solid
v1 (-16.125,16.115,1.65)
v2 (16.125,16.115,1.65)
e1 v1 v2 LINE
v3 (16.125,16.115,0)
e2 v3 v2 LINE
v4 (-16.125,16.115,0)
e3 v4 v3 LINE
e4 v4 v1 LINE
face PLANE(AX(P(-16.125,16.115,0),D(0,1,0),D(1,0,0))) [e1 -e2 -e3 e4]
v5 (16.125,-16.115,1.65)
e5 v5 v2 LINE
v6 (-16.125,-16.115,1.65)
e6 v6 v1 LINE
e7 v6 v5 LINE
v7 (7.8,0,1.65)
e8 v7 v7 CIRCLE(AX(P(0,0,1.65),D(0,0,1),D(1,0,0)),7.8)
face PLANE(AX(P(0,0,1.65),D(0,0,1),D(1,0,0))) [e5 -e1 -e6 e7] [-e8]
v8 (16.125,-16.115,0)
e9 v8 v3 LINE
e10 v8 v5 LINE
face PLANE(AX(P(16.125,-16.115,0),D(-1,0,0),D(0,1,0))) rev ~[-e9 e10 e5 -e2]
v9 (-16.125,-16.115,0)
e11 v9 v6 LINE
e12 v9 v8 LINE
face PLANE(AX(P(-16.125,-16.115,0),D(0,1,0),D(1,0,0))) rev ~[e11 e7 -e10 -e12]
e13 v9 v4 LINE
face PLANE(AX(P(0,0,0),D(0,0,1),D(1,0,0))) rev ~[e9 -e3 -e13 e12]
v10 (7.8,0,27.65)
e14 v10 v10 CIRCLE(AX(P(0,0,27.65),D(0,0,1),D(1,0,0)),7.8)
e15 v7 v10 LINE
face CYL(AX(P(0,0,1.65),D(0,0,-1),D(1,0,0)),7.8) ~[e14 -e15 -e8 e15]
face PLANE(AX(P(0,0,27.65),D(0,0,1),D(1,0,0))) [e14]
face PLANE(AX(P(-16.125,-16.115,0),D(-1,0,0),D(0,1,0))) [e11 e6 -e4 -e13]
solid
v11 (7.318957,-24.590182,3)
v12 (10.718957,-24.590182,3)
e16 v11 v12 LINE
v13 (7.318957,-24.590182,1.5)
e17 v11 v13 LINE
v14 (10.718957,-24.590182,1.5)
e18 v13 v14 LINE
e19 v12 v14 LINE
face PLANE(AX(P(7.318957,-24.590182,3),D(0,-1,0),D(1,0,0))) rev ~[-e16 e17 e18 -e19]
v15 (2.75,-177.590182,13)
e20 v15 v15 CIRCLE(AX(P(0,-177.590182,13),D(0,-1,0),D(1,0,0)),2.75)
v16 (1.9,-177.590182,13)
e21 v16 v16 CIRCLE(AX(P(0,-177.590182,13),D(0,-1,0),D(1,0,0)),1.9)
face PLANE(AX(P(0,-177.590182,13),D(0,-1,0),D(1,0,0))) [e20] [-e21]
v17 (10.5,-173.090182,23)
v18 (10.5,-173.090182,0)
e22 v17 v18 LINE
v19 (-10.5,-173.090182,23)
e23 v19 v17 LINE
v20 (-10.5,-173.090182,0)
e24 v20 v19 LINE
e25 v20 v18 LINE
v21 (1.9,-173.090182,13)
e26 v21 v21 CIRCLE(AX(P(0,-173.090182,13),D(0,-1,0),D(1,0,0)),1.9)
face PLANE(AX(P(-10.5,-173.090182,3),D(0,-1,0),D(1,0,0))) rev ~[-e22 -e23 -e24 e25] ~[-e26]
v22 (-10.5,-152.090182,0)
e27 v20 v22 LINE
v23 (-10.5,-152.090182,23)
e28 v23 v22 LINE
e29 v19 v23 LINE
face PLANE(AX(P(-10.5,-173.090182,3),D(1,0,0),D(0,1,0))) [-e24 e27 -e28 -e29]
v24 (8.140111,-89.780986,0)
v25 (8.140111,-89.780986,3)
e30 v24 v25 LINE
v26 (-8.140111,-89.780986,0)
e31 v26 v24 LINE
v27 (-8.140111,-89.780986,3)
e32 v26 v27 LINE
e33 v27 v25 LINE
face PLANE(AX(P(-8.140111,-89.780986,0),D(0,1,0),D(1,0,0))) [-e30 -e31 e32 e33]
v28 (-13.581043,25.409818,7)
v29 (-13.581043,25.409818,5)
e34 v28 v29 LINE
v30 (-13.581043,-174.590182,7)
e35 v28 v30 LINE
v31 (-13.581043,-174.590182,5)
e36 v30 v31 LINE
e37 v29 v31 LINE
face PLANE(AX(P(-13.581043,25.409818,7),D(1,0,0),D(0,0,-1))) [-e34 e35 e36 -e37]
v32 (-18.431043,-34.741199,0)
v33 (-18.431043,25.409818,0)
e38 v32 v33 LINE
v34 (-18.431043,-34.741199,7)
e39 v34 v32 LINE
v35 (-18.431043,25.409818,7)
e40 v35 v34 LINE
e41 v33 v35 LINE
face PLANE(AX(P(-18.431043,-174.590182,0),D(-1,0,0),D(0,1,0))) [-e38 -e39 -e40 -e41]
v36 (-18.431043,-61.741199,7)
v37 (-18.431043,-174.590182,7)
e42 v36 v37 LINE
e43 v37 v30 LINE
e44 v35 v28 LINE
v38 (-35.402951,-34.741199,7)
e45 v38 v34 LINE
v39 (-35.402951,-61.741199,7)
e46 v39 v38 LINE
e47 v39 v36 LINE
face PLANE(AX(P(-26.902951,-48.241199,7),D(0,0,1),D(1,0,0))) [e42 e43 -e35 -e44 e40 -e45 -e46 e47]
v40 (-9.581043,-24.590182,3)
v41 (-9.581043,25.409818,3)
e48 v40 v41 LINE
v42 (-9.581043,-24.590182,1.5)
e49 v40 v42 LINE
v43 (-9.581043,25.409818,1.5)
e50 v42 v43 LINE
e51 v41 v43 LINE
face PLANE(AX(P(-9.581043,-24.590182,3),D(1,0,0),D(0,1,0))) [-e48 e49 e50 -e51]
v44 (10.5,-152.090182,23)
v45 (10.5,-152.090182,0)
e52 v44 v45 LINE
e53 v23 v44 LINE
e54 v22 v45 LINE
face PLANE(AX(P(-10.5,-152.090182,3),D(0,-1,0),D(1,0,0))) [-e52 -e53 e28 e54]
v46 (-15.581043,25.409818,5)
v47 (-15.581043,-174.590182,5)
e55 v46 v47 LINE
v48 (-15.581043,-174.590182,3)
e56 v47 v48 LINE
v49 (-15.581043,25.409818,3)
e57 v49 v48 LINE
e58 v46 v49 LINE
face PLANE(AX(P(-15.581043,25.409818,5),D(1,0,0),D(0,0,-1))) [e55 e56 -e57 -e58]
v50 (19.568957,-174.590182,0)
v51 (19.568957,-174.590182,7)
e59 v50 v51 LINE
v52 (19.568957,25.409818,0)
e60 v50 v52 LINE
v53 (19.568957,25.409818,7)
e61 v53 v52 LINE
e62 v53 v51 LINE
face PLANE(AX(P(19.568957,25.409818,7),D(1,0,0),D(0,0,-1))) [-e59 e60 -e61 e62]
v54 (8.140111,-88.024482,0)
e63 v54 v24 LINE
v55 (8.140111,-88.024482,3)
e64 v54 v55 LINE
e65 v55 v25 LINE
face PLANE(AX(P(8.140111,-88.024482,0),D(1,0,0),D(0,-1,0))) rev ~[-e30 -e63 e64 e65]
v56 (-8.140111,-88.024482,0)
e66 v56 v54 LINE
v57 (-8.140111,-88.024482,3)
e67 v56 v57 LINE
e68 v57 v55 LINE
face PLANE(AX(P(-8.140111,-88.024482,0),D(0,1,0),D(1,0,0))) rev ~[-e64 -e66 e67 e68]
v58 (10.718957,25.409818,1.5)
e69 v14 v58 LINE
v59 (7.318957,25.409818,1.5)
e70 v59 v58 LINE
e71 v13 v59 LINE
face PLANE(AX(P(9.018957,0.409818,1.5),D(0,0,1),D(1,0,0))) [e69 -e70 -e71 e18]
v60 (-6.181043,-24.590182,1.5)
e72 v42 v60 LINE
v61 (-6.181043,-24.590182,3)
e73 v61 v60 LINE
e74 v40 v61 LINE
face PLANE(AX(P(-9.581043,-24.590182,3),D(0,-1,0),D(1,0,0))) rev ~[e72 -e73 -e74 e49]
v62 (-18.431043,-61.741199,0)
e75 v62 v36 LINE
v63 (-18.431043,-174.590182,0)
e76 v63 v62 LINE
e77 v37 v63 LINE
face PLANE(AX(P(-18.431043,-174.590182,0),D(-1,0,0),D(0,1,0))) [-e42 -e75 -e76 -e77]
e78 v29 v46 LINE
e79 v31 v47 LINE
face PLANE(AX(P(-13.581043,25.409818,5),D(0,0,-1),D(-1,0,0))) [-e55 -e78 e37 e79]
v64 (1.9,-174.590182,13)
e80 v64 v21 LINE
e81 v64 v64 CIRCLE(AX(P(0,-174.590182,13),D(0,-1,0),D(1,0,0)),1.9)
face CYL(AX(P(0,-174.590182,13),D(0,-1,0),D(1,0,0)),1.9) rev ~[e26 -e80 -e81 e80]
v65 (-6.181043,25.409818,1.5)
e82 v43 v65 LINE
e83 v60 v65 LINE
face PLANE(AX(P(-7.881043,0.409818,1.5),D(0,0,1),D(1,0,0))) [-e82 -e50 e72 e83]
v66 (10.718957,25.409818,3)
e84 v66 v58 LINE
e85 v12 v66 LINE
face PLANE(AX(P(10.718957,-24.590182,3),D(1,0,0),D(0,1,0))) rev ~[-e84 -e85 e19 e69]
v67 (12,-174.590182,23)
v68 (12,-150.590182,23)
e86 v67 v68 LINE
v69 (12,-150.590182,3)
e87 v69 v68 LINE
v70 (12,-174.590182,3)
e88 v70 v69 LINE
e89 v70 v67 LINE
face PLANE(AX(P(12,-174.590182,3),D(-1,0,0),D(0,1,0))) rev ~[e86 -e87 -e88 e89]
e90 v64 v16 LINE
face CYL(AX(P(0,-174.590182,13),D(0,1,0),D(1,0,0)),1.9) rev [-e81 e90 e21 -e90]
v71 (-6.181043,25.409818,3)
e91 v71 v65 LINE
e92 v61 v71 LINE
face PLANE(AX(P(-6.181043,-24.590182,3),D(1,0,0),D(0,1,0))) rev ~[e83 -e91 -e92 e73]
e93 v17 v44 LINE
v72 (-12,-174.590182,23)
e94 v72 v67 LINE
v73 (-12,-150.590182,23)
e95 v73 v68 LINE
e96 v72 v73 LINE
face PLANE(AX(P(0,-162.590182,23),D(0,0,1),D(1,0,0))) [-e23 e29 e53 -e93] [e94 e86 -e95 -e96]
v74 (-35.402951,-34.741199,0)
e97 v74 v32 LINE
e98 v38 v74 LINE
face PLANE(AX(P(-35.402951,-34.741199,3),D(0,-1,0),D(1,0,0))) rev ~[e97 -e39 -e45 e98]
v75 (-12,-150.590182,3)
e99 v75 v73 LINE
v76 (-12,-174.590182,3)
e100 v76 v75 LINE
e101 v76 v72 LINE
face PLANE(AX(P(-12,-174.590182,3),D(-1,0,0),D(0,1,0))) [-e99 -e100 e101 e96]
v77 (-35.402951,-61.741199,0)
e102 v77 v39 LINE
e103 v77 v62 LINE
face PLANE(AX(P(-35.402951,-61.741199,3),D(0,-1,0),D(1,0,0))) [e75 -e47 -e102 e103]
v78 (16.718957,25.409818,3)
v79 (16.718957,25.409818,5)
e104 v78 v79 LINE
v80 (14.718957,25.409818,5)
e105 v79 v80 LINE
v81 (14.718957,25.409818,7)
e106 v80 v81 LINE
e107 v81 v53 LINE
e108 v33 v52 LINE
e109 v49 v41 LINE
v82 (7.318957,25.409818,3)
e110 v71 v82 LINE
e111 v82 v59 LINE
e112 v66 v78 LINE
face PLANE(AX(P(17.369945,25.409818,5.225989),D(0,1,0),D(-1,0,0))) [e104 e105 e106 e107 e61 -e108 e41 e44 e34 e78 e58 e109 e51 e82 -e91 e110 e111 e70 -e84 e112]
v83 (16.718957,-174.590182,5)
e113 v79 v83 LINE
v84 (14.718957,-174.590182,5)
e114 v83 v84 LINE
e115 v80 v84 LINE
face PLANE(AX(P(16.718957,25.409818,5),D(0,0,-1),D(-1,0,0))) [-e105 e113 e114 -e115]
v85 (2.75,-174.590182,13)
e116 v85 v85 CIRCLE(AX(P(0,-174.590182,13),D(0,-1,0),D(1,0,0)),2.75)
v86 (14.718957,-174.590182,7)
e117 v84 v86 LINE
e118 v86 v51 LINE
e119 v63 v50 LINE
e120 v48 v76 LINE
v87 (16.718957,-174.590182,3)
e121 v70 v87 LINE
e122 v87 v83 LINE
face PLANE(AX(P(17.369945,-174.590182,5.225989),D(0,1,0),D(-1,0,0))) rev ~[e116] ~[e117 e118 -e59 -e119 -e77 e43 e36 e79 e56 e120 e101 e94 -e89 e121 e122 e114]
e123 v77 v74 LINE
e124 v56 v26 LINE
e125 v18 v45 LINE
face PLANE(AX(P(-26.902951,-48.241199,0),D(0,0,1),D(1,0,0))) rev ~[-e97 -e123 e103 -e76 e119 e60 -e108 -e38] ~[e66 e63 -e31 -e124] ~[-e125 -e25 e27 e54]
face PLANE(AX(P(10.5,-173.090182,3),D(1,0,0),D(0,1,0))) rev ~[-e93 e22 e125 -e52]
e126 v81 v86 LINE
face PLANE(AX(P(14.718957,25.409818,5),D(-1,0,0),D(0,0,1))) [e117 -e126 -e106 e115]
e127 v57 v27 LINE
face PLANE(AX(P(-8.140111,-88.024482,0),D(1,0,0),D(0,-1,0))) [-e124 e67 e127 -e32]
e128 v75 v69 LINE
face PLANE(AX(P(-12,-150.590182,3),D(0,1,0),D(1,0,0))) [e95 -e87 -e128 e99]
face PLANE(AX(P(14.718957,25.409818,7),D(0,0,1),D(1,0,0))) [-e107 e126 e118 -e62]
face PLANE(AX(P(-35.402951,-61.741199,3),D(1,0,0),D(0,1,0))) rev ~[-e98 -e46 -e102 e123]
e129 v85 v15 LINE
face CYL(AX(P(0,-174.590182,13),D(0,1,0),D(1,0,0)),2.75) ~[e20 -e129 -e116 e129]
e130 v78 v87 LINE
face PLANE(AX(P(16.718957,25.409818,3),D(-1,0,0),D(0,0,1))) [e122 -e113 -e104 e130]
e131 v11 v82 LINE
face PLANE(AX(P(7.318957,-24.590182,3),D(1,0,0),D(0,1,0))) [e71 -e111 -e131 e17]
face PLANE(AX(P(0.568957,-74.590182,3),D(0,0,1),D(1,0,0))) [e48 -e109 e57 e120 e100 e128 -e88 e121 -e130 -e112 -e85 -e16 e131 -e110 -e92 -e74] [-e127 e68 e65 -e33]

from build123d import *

# Parameters (mm, degrees)
F0_W           = 32.25
F0_H           = 32.23
F1_DEPTH       = 1.65
F2_R           = 7.8
F3_DEPTH       = 26
F4_W           = 38
F4_H           = 200
F5_DEPTH       = 3
F7_DEPTH       = 200
F8_W           = 24
F8_H           = 24
F8_W_2         = 21
F8_H_2         = 21
F9_DEPTH       = 20
F10_W          = 17
F10_H          = 27
F11_DEPTH      = 4
F11_DEPTH_BACK = 3
F12_W          = 16.2802226841
F12_H          = 1.756504178
F13_DEPTH      = 3
F14_W          = 3.4
F14_H          = 50
F15_DEPTH      = 1.5
F16_DEPTH      = 3
F17_R          = 2.75
F17_R_2        = 1.9
F18_DEPTH      = 3
F19_DEPTH      = 1.5


with BuildPart() as f1:
    # F0 (on Top) → F1 (new body)
    with BuildSketch(Plane.XY):
        Rectangle(F0_W, F0_H)
    extrude(amount=F1_DEPTH)

    # F2 (on face) → F3 (join)
    with BuildSketch(Plane.XY.offset(1.65)):
        Circle(F2_R)
    extrude(amount=F3_DEPTH)


with BuildPart() as f5:
    # F4 (on Top) → F5 (new body)
    with BuildSketch(Plane.XY):
        with Locations((0.5689565417, -74.5901823044)):
            Rectangle(F4_W, F4_H)
    extrude(amount=F5_DEPTH)

    # F6 (on face) → F7 (join, through all)
    with BuildSketch(Plane(origin=(0, 25.4098176956, 0), x_dir=(-1, 0, 0), z_dir=(0, 1, 0))):
        Polygon((-19.5689565417, 3), (-16.7189565417, 3), (-16.7189565417, 5), (-14.7189565417, 5), (-14.7189565417, 7), (-19.5689565417, 7), align=None)
        Polygon((15.5810434583, 5), (15.5810434583, 3), (18.4310434583, 3), (18.4310434583, 7), (13.5810434583, 7), (13.5810434583, 5), align=None)
    extrude(amount=-F7_DEPTH)

    # F8 (on face) → F9 (join)
    with BuildSketch(Plane.XY.offset(3)):
        with Locations((0, -162.5901823044)):
            Rectangle(F8_W, F8_H)
        with Locations((0, -162.5901823044)):
            Rectangle(F8_W_2, F8_H_2, mode=Mode.SUBTRACT)
    extrude(amount=F9_DEPTH)

    # F10 (on face) → F11 (join, two sides)
    with BuildSketch(Plane.XY.offset(3)) as f11_sk:
        with Locations((-26.9029508382, -48.2411993444)):
            Rectangle(F10_W, F10_H)
    extrude(amount=F11_DEPTH)
    extrude(f11_sk.sketch, amount=-F11_DEPTH_BACK)

    # F12 (on face) → F13 (cut, through all)
    with BuildSketch(Plane(origin=(0, 0, 0), x_dir=(1, 0, 0), z_dir=(0, 0, -1))):
        with Locations((0, 88.90273422)):
            Rectangle(F12_W, F12_H)
    extrude(amount=-F13_DEPTH, mode=Mode.SUBTRACT)

    # F14 (on face) → F15 (cut)
    with BuildSketch(Plane.XY.offset(3)):
        with Locations((-7.8810434583, 0.4098176956)):
            Rectangle(F14_W, F14_H)
        with Locations((9.0189565417, 0.4098176956)):
            Rectangle(F14_W, F14_H)
    extrude(amount=-F15_DEPTH, mode=Mode.SUBTRACT)

    # F16 (cut, through all): a face of the model
    f16_faces = [f5.faces().sort_by_distance(p)[0] for p in [
        (0, -162.5901823044, 3),
    ]]
    extrude(f16_faces, amount=-F16_DEPTH, mode=Mode.SUBTRACT)

    # F17 (on face) → F18 (join)
    with BuildSketch(Plane.XZ.offset(174.5901823044)):
        with Locations((0, 13)):
            Circle(F17_R)
        with Locations((0, 13)):
            Circle(F17_R_2, mode=Mode.SUBTRACT)
    extrude(amount=F18_DEPTH)

    # F19 (cut, through all): a face of the model
    f19_faces = [f5.faces().sort_by_distance(p)[0] for p in [
        (0, -174.5901823044, 13),
    ]]
    extrude(f19_faces, amount=-F19_DEPTH, mode=Mode.SUBTRACT)


solid = Compound([f1.part, f5.part])
